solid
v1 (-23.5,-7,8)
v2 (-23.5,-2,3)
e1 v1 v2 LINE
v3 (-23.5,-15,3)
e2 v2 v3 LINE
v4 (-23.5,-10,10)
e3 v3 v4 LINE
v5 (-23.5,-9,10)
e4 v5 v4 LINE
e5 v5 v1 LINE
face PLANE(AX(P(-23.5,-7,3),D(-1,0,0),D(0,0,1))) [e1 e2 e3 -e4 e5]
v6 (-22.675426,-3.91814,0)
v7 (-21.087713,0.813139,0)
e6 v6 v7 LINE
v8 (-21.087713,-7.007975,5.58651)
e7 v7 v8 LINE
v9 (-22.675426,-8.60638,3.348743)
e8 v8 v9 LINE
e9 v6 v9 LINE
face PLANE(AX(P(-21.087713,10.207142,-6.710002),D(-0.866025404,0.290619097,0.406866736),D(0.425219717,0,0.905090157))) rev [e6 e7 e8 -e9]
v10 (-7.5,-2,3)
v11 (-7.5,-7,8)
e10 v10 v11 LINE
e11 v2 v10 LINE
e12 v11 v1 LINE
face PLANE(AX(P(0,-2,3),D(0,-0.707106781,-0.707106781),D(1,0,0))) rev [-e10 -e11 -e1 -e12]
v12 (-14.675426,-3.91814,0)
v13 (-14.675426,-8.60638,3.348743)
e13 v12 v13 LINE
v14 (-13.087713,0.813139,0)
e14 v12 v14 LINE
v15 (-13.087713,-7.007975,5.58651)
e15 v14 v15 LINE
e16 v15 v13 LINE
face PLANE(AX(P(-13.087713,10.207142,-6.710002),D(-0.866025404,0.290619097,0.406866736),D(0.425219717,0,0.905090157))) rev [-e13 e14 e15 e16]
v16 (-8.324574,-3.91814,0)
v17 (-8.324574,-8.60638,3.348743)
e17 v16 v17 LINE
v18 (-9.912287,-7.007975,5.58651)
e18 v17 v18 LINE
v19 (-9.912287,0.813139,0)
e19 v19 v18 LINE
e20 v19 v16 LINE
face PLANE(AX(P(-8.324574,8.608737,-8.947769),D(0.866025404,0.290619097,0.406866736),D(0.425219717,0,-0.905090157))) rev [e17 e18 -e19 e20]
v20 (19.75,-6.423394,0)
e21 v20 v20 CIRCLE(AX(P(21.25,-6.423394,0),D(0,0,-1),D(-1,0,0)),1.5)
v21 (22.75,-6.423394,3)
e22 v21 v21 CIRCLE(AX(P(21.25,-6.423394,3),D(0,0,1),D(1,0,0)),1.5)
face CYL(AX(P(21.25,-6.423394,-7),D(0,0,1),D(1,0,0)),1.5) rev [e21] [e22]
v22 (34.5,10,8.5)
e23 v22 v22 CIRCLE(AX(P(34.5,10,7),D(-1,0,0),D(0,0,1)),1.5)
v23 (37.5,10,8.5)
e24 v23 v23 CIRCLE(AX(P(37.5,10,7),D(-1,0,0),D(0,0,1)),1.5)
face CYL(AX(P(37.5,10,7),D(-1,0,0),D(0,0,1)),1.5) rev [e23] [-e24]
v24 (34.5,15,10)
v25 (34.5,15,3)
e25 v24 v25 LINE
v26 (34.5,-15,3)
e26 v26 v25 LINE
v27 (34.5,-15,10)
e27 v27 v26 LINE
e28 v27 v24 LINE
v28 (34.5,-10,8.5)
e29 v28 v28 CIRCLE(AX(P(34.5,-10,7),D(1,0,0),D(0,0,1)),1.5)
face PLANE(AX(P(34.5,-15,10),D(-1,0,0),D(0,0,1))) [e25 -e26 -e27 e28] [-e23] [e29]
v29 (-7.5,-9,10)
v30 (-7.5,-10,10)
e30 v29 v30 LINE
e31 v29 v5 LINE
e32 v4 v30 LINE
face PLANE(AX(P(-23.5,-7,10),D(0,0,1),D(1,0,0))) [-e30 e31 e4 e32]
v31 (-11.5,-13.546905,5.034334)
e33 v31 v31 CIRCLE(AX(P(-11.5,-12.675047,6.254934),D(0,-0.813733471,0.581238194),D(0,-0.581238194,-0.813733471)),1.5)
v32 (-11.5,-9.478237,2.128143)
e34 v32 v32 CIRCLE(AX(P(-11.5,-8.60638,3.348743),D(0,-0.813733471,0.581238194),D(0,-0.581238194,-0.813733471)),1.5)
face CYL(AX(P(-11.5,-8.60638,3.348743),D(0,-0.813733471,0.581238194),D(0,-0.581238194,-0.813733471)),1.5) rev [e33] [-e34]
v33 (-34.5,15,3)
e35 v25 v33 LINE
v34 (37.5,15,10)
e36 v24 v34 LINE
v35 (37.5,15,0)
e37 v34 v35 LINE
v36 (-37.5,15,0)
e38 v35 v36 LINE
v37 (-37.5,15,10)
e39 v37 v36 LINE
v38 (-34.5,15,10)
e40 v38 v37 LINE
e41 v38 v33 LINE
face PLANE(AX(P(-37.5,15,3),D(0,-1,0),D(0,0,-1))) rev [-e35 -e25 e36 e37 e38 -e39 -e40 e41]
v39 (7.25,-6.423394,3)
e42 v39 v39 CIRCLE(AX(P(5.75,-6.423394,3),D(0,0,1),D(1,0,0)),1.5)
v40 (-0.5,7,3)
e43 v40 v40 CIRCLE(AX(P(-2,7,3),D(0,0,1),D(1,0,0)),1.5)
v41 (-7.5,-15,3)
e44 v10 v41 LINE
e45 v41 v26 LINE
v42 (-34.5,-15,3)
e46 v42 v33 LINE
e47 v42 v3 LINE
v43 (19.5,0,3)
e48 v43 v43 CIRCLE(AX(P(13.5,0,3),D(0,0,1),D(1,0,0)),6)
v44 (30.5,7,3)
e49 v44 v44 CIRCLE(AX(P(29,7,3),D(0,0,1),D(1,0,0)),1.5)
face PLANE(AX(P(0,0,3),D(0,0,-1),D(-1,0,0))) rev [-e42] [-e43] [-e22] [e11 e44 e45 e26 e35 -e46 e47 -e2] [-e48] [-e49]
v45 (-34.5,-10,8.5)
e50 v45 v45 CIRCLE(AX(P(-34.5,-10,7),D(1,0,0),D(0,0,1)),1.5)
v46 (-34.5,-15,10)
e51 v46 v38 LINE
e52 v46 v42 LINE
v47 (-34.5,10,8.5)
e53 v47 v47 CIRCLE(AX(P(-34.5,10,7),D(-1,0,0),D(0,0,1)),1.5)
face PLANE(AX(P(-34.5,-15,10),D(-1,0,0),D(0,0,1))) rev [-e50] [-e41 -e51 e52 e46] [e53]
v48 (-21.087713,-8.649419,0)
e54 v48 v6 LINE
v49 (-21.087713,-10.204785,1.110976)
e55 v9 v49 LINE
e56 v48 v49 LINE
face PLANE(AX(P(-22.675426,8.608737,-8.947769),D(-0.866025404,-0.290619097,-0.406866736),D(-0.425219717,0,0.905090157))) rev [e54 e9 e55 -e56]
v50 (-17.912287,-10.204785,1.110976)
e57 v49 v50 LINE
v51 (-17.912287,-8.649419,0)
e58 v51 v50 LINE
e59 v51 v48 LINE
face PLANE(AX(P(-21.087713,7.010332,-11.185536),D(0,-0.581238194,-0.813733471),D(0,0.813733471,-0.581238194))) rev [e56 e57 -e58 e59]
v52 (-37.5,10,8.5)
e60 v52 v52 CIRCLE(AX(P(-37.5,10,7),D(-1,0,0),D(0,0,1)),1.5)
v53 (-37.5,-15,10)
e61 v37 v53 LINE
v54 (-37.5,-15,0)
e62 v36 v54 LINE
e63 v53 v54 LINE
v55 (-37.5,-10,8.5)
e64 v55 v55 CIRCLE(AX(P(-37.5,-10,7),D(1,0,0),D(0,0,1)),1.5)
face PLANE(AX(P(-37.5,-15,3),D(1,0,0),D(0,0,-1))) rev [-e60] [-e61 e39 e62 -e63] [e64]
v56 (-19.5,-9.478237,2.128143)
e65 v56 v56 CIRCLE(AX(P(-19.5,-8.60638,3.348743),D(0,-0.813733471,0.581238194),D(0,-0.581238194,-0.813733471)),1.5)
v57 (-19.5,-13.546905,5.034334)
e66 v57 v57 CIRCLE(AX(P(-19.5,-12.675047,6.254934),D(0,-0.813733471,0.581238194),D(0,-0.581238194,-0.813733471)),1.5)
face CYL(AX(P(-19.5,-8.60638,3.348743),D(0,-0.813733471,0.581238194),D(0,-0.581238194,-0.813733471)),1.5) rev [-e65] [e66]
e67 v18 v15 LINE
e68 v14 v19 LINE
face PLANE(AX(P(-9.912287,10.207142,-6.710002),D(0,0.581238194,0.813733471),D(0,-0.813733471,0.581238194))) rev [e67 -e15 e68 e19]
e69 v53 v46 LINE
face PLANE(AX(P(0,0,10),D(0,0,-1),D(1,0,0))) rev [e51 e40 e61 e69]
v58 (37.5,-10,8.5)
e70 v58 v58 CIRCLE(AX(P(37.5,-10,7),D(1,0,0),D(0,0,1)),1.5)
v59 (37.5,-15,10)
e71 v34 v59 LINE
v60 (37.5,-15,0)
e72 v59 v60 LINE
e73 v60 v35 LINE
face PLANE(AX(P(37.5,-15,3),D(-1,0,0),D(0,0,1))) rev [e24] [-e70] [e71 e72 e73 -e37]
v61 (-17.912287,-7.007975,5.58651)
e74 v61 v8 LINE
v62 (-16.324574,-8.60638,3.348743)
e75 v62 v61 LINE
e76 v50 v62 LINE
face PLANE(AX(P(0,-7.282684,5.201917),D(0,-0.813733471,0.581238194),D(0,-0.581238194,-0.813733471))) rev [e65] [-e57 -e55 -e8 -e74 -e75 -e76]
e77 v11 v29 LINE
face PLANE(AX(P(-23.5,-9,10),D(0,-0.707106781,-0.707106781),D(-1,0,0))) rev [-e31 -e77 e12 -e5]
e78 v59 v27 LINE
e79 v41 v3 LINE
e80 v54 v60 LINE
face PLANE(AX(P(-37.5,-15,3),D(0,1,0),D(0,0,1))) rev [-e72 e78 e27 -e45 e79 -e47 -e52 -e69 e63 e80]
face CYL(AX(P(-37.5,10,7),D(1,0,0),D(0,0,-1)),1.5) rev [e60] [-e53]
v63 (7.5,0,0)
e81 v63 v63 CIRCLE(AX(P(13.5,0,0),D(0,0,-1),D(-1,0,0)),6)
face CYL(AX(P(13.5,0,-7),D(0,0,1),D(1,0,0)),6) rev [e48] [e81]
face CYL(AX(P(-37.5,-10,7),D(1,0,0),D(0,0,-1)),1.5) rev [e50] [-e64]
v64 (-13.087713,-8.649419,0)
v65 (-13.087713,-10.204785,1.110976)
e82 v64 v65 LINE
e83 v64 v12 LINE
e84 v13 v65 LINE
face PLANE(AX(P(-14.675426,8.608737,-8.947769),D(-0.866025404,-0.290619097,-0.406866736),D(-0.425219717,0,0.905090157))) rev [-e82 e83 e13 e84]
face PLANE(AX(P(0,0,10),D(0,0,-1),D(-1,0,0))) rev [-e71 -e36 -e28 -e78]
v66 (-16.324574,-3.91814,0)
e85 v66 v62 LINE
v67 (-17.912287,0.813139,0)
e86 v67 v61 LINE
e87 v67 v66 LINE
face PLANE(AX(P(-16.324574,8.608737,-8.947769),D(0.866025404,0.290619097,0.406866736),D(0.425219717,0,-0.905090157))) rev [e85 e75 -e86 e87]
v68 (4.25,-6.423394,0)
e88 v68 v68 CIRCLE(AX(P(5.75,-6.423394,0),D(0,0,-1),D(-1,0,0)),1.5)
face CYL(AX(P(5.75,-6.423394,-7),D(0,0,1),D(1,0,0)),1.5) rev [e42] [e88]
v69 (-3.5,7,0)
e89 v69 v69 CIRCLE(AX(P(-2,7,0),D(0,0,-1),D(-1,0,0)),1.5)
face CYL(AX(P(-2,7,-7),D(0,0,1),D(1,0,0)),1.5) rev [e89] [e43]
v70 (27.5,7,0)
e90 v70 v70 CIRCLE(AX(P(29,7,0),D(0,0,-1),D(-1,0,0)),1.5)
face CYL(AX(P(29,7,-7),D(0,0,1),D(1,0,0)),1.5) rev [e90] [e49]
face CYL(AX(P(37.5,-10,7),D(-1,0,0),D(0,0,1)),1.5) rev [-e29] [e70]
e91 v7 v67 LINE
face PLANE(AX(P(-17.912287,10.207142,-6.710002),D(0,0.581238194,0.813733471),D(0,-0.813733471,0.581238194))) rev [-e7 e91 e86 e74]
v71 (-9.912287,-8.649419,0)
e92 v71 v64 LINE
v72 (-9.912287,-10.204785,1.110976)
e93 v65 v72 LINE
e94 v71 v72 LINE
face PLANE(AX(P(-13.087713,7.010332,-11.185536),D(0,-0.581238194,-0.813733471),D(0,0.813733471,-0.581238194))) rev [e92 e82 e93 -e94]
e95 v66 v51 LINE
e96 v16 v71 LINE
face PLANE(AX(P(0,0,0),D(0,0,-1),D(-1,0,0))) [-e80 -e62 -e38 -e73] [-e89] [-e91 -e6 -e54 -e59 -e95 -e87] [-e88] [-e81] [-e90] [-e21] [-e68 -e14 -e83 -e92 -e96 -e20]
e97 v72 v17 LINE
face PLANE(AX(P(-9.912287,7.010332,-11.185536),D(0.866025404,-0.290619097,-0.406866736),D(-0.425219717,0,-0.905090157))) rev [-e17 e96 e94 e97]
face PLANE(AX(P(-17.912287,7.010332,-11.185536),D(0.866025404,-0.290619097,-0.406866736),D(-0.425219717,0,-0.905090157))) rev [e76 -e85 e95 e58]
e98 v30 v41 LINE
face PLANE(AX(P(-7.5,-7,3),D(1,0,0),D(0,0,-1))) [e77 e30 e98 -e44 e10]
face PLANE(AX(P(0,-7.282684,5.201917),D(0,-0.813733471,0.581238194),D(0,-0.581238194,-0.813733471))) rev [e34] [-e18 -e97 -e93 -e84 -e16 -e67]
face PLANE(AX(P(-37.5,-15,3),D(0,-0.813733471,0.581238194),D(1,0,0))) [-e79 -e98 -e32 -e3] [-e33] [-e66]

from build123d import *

# Parameters (mm, degrees)
SKETCH1_W               = 75
SKETCH1_H               = 30
BOSS_EXTRUDE1_DEPTH     = 3
SKETCH2_W               = 3
SKETCH2_H               = 30
BOSS_EXTRUDE2_DEPTH     = 10
SKETCH4_R               = 1.5
CUT_EXTRUDE1_DEPTH      = 3
MIRROR1_COPY_1_SKETCH_R = 1.5
MIRROR1_COPY_1_DEPTH    = 3
SKETCH5_R               = 6
SKETCH5_R_2             = 1.5
CUT_EXTRUDE2_DEPTH      = 10
SKETCH6_W               = 16
SKETCH6_H               = 7
BOSS_EXTRUDE3_DEPTH     = 8
CHAMFER1_SIZE           = 7
CHAMFER1_SIZE2          = 5
SKETCH7_R               = 1.5
CUT_EXTRUDE3_DEPTH      = 5
CHAMFER2_SIZE           = 5
CHAMFER3_SIZE           = 2
CUT_EXTRUDE4_START      = -5
CUT_EXTRUDE4_DEPTH      = 42.544442581


with BuildPart() as part:
    # Sketch1 → Boss-Extrude1 (new body)
    with BuildSketch(Plane.XY):
        Rectangle(SKETCH1_W, SKETCH1_H)
    extrude(amount=BOSS_EXTRUDE1_DEPTH)

    # Sketch2 → Boss-Extrude2 (add)
    with BuildSketch(Plane(origin=(0, 0, 0), x_dir=(-1, 0, 0), z_dir=(0, 0, -1))):
        with Locations((-36, 0)):
            Rectangle(SKETCH2_W, SKETCH2_H)
    boss_extrude2 = extrude(amount=-BOSS_EXTRUDE2_DEPTH)

    # Sketch4 → Cut-Extrude1 (cut)
    with BuildSketch(Plane.ZY.offset(-34.5)):
        with Locations((7, 10)):
            Circle(SKETCH4_R)
    cut_extrude1 = extrude(amount=-CUT_EXTRUDE1_DEPTH, mode=Mode.SUBTRACT)

    # Mirror2: Cut-Extrude1 across plane
    add(cut_extrude1.mirror(Plane.ZX), mode=Mode.SUBTRACT)

    # Mirror1: Boss-Extrude2, Cut-Extrude1 across plane
    add(boss_extrude2.mirror(Plane(origin=(0, 0, 0), x_dir=(0, 0, 1), z_dir=(1, 0, 0))))
    add(cut_extrude1.mirror(Plane(origin=(0, 0, 0), x_dir=(0, 0, 1), z_dir=(1, 0, 0))), mode=Mode.SUBTRACT)

    # Mirror1 copy 1 sketch → Mirror1 copy 1 (cut)
    with BuildSketch(Plane(origin=(-34.5, 0, 0), x_dir=(0, 0, 1), z_dir=(1, 0, 0))):
        with Locations((7, 10)):
            Circle(MIRROR1_COPY_1_SKETCH_R)
    extrude(amount=-MIRROR1_COPY_1_DEPTH, mode=Mode.SUBTRACT)

    # Sketch5 → Cut-Extrude2 (cut)
    with BuildSketch(Plane.XY.offset(3)):
        with Locations((13.5, 0)):
            Circle(SKETCH5_R)
        with Locations((29, 7)):
            Circle(SKETCH5_R_2)
        with Locations((21.25, -6.423393759)):
            Circle(SKETCH5_R_2)
        with Locations((5.75, -6.423393759)):
            Circle(SKETCH5_R_2)
        with Locations((-2, 7)):
            Circle(SKETCH5_R_2)
    extrude(amount=-CUT_EXTRUDE2_DEPTH, mode=Mode.SUBTRACT)

    # Sketch6 → Boss-Extrude3 (add)
    with BuildSketch(Plane.XZ.offset(15)):
        with Locations((-15.5, 6.5)):
            Rectangle(SKETCH6_W, SKETCH6_H)
    extrude(amount=-BOSS_EXTRUDE3_DEPTH)

    # Chamfer1
    chamfer1_edges = [part.edges().sort_by_distance(p)[0] for p in [
        (-15.5, -15, 10),
    ]]
    chamfer1_side = [part.faces().sort_by_distance(p)[0] for p in [
        (0, -15, 0.756637298),
    ]]
    chamfer(chamfer1_edges, length=CHAMFER1_SIZE, length2=CHAMFER1_SIZE2, reference=chamfer1_side[0])

    # Sketch7 → Cut-Extrude3 (cut)
    with BuildSketch(Plane(origin=(0, -11.351351351, 8.108108108), x_dir=(1, 0, 0), z_dir=(0, -0.8137334712067348, 0.5812381937190968))):
        with Locations(Location((-19.5, -2.277372492, 0), (0, 0, 270))):
            Circle(SKETCH7_R)
        with Locations(Location((-11.5, -2.277372492, 0), (0, 0, 270))):
            Circle(SKETCH7_R)
    extrude(amount=-CUT_EXTRUDE3_DEPTH, mode=Mode.SUBTRACT)

    # Chamfer2
    chamfer2_edges = [part.edges().sort_by_distance(p)[0] for p in [
        (-15.5, -7, 3),
    ]]
    chamfer(chamfer2_edges, length=CHAMFER2_SIZE)

    # Chamfer3
    chamfer3_edges = [part.edges().sort_by_distance(p)[0] for p in [
        (-15.5, -7, 10),
    ]]
    chamfer(chamfer3_edges, length=CHAMFER3_SIZE - 0.0001)  # a hair under: the kernel refuses the full size

    # Sketch8 → Cut-Extrude4 (cut, through all)
    with BuildSketch(Plane(origin=(0, -11.351351351, 8.108108108), x_dir=(1, 0, 0), z_dir=(0, -0.8137334712067347, 0.5812381937190967)).offset(CUT_EXTRUDE4_START)):
        Polygon((-16.324573519, -2.277372492), (-17.91228676, 0.472627508), (-21.08771324, 0.472627508), (-22.675426481, -2.277372492), (-21.08771324, -5.027372492), (-17.91228676, -5.027372492), align=None)
        Polygon((-8.324573519, -2.277372492), (-9.91228676, 0.472627508), (-13.08771324, 0.472627508), (-14.675426481, -2.277372492), (-13.08771324, -5.027372492), (-9.91228676, -5.027372492), align=None)
    extrude(amount=-CUT_EXTRUDE4_DEPTH, mode=Mode.SUBTRACT)


solid = part.part
